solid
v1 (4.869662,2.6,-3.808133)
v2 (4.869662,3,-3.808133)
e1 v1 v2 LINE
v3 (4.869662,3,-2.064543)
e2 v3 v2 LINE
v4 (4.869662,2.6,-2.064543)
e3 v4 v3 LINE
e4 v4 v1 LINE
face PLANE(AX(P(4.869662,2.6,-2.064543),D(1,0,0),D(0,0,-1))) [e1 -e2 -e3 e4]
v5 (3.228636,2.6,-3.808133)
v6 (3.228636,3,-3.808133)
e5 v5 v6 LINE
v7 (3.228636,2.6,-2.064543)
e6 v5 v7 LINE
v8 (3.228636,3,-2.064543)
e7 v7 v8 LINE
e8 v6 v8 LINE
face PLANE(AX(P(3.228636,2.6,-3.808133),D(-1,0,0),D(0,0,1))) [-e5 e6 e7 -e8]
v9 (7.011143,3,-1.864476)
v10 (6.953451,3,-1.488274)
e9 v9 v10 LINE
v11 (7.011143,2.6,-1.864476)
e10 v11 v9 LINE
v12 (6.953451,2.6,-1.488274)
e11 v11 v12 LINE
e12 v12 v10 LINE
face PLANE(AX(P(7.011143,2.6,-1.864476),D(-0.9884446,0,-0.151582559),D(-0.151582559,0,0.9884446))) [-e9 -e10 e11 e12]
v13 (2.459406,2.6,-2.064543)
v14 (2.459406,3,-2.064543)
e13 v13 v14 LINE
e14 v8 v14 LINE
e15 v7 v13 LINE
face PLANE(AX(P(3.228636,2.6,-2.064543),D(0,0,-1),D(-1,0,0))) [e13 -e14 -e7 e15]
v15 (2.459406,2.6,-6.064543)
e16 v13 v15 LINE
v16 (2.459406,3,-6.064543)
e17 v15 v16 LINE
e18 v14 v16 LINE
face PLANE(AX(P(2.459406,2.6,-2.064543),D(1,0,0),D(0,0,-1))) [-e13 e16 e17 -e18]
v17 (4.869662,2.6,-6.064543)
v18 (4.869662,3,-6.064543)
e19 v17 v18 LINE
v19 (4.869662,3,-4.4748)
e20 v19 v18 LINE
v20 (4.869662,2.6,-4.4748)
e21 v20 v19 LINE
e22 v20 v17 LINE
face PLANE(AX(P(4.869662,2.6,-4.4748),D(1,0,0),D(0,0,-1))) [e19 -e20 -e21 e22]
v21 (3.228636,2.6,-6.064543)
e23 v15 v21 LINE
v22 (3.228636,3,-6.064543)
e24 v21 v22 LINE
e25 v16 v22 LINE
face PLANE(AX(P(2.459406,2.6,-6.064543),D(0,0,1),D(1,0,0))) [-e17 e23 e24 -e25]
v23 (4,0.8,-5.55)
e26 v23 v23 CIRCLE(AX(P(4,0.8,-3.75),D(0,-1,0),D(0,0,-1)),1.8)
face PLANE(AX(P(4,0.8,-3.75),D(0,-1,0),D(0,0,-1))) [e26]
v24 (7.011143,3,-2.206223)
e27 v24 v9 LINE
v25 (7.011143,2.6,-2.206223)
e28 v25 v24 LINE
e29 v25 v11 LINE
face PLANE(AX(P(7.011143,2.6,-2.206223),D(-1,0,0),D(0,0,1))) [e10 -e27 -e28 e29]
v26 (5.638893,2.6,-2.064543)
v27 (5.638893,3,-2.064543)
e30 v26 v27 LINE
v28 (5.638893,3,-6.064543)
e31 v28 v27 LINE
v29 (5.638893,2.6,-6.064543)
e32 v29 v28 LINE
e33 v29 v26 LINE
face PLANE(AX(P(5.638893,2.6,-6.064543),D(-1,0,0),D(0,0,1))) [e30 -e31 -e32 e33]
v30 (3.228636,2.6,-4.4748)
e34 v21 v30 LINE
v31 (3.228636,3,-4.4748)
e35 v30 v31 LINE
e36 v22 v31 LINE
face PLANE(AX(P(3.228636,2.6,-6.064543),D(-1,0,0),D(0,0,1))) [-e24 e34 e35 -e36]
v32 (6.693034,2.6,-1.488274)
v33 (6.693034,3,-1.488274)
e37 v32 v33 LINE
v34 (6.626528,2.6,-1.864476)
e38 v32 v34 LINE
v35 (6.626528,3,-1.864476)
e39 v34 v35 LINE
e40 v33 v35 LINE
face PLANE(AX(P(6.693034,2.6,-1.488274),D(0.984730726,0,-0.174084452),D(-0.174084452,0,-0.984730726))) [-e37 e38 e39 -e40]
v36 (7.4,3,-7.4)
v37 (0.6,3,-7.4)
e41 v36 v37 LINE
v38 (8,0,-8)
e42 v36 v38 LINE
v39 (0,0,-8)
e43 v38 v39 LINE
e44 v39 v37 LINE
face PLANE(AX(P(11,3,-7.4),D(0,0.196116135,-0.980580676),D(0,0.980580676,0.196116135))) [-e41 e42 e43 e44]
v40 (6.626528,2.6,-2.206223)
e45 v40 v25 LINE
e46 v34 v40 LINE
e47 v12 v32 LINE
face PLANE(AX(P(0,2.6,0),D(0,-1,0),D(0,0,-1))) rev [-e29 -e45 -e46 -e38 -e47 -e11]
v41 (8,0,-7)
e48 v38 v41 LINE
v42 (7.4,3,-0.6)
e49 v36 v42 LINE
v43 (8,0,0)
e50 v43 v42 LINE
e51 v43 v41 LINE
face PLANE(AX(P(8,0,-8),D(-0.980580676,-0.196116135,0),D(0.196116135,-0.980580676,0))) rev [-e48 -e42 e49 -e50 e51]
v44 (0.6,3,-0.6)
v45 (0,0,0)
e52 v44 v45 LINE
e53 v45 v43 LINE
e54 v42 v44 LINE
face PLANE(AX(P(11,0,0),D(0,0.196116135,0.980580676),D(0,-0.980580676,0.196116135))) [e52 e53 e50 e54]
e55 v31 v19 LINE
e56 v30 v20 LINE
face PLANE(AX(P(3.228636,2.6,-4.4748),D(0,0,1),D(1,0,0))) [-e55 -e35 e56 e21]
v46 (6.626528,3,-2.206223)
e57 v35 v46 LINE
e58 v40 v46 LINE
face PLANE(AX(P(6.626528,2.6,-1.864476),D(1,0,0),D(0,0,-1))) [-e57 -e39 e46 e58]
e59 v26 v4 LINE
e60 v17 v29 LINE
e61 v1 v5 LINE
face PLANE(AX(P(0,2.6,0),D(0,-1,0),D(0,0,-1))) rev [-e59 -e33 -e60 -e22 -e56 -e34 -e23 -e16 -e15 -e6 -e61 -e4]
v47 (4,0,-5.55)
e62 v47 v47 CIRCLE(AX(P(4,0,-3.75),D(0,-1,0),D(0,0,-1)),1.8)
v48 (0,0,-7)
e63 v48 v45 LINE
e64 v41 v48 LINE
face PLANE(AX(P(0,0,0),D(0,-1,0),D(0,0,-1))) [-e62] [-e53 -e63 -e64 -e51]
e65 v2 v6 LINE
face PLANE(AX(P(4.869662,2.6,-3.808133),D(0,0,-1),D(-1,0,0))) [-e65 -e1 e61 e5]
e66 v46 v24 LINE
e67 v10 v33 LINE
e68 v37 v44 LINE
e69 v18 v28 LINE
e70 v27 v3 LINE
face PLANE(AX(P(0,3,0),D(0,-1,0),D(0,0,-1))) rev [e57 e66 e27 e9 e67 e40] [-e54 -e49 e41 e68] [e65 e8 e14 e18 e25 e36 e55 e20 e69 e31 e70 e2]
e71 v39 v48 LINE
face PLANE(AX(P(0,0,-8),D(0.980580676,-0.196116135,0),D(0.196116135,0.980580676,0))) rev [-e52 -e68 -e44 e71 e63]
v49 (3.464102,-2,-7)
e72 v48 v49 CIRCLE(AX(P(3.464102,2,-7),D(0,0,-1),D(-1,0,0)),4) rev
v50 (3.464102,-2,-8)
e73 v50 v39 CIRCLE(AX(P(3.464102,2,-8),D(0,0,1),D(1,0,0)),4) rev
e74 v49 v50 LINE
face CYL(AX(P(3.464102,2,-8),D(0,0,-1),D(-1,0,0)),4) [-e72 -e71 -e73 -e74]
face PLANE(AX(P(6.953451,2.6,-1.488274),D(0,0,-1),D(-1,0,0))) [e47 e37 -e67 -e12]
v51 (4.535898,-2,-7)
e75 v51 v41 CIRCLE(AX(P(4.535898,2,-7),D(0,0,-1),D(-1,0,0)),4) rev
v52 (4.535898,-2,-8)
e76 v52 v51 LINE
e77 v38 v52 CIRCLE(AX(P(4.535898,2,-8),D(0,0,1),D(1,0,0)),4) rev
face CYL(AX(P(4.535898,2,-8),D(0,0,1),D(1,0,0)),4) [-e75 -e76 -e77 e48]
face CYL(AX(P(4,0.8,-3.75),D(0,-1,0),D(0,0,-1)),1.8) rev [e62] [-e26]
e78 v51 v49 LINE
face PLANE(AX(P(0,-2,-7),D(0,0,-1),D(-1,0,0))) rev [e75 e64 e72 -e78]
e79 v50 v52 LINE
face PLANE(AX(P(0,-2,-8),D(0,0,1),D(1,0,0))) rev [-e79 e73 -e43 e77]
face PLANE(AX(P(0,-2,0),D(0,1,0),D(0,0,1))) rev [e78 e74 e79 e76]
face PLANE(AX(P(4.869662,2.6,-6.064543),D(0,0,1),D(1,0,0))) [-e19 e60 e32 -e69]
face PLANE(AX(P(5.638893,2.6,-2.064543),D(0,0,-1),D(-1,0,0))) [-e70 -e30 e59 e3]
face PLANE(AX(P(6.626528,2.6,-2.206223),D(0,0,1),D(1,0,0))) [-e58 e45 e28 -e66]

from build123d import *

# Parameters (mm, degrees)
SKETCH1_W               = 8
SKETCH1_H               = 8
BOSS_EXTRUDE1_DEPTH     = 3
CUT_EXTRUDE1_DEPTH      = 12.704699911
CUT_EXTRUDE1_DEPTH_BACK = 12.704699911
CUT_EXTRUDE2_DEPTH      = 11
SKETCH4_R               = 1.8
CUT_EXTRUDE3_DEPTH      = 0.8
SKETCH5_W               = 8
SKETCH5_H               = 1
BOSS_EXTRUDE2_DEPTH     = 2
FILLET1_R               = 4
CUT_EXTRUDE4_DEPTH      = 0.4
CUT_EXTRUDE5_DEPTH      = 0.4


with BuildPart() as part:
    # Sketch1 → Boss-Extrude1 (new body)
    with BuildSketch(Plane(origin=(0, 0, 0), x_dir=(1, 0, 0), z_dir=(0, 1, 0))):
        with Locations((4, 4)):
            Rectangle(SKETCH1_W, SKETCH1_H)
    extrude(amount=BOSS_EXTRUDE1_DEPTH)

    # Sketch2 → Cut-Extrude1 (cut, two sides: drawn at the far end of the back side and taken through both)
    with BuildSketch(Plane.XY.offset(-CUT_EXTRUDE1_DEPTH_BACK)):
        Polygon((0, 0), (0.6, 3), (0, 3), align=None)
        Polygon((8, 0), (7.4, 3), (8, 3), align=None)
    extrude(amount=CUT_EXTRUDE1_DEPTH + CUT_EXTRUDE1_DEPTH_BACK, mode=Mode.SUBTRACT)

    # Sketch3 → Cut-Extrude2 (cut)
    with BuildSketch(Plane(origin=(0, 0, 0), x_dir=(0, 0, -1), z_dir=(1, 0, 0))):
        Polygon((0, 0), (0.6, 3), (0, 3), align=None)
        Polygon((8, 3), (7.4, 3), (8, 0), align=None)
    extrude(amount=CUT_EXTRUDE2_DEPTH, mode=Mode.SUBTRACT)

    # Sketch4 → Cut-Extrude3 (cut)
    with BuildSketch(Plane.XZ):
        with Locations(Location((4, -3.75, 0), (0, 0, 270))):
            Circle(SKETCH4_R)
    extrude(amount=-CUT_EXTRUDE3_DEPTH, mode=Mode.SUBTRACT)

    # Sketch5 → Boss-Extrude2 (add)
    with BuildSketch(Plane.XZ):
        with Locations((4, -7.5)):
            Rectangle(SKETCH5_W, SKETCH5_H)
    extrude(amount=BOSS_EXTRUDE2_DEPTH)

    # Fillet1
    # the kernel refuses this fillet: 4 mm, written as the material it takes off along each edge
    with BuildSketch(Plane(origin=(8, -2, -16.660254038), x_dir=(0, 1, 0), z_dir=(0, 0, 1)), Plane(origin=(0, -2, 1.660254038), x_dir=(0, 1, 0), z_dir=(0, 0, -1))) as fillet1_piece_1:
        with BuildLine():
            CenterArc((4, 3.464101615), FILLET1_R, 180, 60)
            Line((0, 3.464101615), (-0.08, 3.464101615))
            Line((-0.08, 3.464101615), (-0.08, 0))
            Line((-0.08, 0), (0, -0.08))
            ThreePointArc((0, -0.08), (1, -0.08), (1.96, -0.069282032))
            Line((1.96, -0.069282032), (2, 0))
        make_face()
    extrude(amount=18.320508076, mode=Mode.SUBTRACT)

    # Sketch6 → Cut-Extrude4 (cut)
    with BuildSketch(Plane(origin=(0, 3, 0), x_dir=(1, 0, 0), z_dir=(0, 1, 0))):
        Polygon((2.459405501, 2.064543337), (2.459405501, 6.064543337), (3.22863627, 6.064543337), (3.22863627, 4.474799747), (4.869661911, 4.474799747), (4.869661911, 6.064543337), (5.63889268, 6.064543337), (5.63889268, 2.064543337), (4.869661911, 2.064543337), (4.869661911, 3.80813308), (3.22863627, 3.80813308), (3.22863627, 2.064543337), align=None)
    extrude(amount=-CUT_EXTRUDE4_DEPTH, mode=Mode.SUBTRACT)

    # Sketch7 → Cut-Extrude5 (cut)
    with BuildSketch(Plane(origin=(0, 3, 0), x_dir=(1, 0, 0), z_dir=(0, 1, 0))):
        Polygon((6.693034442, 1.488274187), (6.626528032, 1.86447611), (6.626528032, 2.206222905), (7.011143417, 2.206222905), (7.011143417, 1.86447611), (6.953451109, 1.488274187), align=None)
    extrude(amount=-CUT_EXTRUDE5_DEPTH, mode=Mode.SUBTRACT)


solid = part.part
